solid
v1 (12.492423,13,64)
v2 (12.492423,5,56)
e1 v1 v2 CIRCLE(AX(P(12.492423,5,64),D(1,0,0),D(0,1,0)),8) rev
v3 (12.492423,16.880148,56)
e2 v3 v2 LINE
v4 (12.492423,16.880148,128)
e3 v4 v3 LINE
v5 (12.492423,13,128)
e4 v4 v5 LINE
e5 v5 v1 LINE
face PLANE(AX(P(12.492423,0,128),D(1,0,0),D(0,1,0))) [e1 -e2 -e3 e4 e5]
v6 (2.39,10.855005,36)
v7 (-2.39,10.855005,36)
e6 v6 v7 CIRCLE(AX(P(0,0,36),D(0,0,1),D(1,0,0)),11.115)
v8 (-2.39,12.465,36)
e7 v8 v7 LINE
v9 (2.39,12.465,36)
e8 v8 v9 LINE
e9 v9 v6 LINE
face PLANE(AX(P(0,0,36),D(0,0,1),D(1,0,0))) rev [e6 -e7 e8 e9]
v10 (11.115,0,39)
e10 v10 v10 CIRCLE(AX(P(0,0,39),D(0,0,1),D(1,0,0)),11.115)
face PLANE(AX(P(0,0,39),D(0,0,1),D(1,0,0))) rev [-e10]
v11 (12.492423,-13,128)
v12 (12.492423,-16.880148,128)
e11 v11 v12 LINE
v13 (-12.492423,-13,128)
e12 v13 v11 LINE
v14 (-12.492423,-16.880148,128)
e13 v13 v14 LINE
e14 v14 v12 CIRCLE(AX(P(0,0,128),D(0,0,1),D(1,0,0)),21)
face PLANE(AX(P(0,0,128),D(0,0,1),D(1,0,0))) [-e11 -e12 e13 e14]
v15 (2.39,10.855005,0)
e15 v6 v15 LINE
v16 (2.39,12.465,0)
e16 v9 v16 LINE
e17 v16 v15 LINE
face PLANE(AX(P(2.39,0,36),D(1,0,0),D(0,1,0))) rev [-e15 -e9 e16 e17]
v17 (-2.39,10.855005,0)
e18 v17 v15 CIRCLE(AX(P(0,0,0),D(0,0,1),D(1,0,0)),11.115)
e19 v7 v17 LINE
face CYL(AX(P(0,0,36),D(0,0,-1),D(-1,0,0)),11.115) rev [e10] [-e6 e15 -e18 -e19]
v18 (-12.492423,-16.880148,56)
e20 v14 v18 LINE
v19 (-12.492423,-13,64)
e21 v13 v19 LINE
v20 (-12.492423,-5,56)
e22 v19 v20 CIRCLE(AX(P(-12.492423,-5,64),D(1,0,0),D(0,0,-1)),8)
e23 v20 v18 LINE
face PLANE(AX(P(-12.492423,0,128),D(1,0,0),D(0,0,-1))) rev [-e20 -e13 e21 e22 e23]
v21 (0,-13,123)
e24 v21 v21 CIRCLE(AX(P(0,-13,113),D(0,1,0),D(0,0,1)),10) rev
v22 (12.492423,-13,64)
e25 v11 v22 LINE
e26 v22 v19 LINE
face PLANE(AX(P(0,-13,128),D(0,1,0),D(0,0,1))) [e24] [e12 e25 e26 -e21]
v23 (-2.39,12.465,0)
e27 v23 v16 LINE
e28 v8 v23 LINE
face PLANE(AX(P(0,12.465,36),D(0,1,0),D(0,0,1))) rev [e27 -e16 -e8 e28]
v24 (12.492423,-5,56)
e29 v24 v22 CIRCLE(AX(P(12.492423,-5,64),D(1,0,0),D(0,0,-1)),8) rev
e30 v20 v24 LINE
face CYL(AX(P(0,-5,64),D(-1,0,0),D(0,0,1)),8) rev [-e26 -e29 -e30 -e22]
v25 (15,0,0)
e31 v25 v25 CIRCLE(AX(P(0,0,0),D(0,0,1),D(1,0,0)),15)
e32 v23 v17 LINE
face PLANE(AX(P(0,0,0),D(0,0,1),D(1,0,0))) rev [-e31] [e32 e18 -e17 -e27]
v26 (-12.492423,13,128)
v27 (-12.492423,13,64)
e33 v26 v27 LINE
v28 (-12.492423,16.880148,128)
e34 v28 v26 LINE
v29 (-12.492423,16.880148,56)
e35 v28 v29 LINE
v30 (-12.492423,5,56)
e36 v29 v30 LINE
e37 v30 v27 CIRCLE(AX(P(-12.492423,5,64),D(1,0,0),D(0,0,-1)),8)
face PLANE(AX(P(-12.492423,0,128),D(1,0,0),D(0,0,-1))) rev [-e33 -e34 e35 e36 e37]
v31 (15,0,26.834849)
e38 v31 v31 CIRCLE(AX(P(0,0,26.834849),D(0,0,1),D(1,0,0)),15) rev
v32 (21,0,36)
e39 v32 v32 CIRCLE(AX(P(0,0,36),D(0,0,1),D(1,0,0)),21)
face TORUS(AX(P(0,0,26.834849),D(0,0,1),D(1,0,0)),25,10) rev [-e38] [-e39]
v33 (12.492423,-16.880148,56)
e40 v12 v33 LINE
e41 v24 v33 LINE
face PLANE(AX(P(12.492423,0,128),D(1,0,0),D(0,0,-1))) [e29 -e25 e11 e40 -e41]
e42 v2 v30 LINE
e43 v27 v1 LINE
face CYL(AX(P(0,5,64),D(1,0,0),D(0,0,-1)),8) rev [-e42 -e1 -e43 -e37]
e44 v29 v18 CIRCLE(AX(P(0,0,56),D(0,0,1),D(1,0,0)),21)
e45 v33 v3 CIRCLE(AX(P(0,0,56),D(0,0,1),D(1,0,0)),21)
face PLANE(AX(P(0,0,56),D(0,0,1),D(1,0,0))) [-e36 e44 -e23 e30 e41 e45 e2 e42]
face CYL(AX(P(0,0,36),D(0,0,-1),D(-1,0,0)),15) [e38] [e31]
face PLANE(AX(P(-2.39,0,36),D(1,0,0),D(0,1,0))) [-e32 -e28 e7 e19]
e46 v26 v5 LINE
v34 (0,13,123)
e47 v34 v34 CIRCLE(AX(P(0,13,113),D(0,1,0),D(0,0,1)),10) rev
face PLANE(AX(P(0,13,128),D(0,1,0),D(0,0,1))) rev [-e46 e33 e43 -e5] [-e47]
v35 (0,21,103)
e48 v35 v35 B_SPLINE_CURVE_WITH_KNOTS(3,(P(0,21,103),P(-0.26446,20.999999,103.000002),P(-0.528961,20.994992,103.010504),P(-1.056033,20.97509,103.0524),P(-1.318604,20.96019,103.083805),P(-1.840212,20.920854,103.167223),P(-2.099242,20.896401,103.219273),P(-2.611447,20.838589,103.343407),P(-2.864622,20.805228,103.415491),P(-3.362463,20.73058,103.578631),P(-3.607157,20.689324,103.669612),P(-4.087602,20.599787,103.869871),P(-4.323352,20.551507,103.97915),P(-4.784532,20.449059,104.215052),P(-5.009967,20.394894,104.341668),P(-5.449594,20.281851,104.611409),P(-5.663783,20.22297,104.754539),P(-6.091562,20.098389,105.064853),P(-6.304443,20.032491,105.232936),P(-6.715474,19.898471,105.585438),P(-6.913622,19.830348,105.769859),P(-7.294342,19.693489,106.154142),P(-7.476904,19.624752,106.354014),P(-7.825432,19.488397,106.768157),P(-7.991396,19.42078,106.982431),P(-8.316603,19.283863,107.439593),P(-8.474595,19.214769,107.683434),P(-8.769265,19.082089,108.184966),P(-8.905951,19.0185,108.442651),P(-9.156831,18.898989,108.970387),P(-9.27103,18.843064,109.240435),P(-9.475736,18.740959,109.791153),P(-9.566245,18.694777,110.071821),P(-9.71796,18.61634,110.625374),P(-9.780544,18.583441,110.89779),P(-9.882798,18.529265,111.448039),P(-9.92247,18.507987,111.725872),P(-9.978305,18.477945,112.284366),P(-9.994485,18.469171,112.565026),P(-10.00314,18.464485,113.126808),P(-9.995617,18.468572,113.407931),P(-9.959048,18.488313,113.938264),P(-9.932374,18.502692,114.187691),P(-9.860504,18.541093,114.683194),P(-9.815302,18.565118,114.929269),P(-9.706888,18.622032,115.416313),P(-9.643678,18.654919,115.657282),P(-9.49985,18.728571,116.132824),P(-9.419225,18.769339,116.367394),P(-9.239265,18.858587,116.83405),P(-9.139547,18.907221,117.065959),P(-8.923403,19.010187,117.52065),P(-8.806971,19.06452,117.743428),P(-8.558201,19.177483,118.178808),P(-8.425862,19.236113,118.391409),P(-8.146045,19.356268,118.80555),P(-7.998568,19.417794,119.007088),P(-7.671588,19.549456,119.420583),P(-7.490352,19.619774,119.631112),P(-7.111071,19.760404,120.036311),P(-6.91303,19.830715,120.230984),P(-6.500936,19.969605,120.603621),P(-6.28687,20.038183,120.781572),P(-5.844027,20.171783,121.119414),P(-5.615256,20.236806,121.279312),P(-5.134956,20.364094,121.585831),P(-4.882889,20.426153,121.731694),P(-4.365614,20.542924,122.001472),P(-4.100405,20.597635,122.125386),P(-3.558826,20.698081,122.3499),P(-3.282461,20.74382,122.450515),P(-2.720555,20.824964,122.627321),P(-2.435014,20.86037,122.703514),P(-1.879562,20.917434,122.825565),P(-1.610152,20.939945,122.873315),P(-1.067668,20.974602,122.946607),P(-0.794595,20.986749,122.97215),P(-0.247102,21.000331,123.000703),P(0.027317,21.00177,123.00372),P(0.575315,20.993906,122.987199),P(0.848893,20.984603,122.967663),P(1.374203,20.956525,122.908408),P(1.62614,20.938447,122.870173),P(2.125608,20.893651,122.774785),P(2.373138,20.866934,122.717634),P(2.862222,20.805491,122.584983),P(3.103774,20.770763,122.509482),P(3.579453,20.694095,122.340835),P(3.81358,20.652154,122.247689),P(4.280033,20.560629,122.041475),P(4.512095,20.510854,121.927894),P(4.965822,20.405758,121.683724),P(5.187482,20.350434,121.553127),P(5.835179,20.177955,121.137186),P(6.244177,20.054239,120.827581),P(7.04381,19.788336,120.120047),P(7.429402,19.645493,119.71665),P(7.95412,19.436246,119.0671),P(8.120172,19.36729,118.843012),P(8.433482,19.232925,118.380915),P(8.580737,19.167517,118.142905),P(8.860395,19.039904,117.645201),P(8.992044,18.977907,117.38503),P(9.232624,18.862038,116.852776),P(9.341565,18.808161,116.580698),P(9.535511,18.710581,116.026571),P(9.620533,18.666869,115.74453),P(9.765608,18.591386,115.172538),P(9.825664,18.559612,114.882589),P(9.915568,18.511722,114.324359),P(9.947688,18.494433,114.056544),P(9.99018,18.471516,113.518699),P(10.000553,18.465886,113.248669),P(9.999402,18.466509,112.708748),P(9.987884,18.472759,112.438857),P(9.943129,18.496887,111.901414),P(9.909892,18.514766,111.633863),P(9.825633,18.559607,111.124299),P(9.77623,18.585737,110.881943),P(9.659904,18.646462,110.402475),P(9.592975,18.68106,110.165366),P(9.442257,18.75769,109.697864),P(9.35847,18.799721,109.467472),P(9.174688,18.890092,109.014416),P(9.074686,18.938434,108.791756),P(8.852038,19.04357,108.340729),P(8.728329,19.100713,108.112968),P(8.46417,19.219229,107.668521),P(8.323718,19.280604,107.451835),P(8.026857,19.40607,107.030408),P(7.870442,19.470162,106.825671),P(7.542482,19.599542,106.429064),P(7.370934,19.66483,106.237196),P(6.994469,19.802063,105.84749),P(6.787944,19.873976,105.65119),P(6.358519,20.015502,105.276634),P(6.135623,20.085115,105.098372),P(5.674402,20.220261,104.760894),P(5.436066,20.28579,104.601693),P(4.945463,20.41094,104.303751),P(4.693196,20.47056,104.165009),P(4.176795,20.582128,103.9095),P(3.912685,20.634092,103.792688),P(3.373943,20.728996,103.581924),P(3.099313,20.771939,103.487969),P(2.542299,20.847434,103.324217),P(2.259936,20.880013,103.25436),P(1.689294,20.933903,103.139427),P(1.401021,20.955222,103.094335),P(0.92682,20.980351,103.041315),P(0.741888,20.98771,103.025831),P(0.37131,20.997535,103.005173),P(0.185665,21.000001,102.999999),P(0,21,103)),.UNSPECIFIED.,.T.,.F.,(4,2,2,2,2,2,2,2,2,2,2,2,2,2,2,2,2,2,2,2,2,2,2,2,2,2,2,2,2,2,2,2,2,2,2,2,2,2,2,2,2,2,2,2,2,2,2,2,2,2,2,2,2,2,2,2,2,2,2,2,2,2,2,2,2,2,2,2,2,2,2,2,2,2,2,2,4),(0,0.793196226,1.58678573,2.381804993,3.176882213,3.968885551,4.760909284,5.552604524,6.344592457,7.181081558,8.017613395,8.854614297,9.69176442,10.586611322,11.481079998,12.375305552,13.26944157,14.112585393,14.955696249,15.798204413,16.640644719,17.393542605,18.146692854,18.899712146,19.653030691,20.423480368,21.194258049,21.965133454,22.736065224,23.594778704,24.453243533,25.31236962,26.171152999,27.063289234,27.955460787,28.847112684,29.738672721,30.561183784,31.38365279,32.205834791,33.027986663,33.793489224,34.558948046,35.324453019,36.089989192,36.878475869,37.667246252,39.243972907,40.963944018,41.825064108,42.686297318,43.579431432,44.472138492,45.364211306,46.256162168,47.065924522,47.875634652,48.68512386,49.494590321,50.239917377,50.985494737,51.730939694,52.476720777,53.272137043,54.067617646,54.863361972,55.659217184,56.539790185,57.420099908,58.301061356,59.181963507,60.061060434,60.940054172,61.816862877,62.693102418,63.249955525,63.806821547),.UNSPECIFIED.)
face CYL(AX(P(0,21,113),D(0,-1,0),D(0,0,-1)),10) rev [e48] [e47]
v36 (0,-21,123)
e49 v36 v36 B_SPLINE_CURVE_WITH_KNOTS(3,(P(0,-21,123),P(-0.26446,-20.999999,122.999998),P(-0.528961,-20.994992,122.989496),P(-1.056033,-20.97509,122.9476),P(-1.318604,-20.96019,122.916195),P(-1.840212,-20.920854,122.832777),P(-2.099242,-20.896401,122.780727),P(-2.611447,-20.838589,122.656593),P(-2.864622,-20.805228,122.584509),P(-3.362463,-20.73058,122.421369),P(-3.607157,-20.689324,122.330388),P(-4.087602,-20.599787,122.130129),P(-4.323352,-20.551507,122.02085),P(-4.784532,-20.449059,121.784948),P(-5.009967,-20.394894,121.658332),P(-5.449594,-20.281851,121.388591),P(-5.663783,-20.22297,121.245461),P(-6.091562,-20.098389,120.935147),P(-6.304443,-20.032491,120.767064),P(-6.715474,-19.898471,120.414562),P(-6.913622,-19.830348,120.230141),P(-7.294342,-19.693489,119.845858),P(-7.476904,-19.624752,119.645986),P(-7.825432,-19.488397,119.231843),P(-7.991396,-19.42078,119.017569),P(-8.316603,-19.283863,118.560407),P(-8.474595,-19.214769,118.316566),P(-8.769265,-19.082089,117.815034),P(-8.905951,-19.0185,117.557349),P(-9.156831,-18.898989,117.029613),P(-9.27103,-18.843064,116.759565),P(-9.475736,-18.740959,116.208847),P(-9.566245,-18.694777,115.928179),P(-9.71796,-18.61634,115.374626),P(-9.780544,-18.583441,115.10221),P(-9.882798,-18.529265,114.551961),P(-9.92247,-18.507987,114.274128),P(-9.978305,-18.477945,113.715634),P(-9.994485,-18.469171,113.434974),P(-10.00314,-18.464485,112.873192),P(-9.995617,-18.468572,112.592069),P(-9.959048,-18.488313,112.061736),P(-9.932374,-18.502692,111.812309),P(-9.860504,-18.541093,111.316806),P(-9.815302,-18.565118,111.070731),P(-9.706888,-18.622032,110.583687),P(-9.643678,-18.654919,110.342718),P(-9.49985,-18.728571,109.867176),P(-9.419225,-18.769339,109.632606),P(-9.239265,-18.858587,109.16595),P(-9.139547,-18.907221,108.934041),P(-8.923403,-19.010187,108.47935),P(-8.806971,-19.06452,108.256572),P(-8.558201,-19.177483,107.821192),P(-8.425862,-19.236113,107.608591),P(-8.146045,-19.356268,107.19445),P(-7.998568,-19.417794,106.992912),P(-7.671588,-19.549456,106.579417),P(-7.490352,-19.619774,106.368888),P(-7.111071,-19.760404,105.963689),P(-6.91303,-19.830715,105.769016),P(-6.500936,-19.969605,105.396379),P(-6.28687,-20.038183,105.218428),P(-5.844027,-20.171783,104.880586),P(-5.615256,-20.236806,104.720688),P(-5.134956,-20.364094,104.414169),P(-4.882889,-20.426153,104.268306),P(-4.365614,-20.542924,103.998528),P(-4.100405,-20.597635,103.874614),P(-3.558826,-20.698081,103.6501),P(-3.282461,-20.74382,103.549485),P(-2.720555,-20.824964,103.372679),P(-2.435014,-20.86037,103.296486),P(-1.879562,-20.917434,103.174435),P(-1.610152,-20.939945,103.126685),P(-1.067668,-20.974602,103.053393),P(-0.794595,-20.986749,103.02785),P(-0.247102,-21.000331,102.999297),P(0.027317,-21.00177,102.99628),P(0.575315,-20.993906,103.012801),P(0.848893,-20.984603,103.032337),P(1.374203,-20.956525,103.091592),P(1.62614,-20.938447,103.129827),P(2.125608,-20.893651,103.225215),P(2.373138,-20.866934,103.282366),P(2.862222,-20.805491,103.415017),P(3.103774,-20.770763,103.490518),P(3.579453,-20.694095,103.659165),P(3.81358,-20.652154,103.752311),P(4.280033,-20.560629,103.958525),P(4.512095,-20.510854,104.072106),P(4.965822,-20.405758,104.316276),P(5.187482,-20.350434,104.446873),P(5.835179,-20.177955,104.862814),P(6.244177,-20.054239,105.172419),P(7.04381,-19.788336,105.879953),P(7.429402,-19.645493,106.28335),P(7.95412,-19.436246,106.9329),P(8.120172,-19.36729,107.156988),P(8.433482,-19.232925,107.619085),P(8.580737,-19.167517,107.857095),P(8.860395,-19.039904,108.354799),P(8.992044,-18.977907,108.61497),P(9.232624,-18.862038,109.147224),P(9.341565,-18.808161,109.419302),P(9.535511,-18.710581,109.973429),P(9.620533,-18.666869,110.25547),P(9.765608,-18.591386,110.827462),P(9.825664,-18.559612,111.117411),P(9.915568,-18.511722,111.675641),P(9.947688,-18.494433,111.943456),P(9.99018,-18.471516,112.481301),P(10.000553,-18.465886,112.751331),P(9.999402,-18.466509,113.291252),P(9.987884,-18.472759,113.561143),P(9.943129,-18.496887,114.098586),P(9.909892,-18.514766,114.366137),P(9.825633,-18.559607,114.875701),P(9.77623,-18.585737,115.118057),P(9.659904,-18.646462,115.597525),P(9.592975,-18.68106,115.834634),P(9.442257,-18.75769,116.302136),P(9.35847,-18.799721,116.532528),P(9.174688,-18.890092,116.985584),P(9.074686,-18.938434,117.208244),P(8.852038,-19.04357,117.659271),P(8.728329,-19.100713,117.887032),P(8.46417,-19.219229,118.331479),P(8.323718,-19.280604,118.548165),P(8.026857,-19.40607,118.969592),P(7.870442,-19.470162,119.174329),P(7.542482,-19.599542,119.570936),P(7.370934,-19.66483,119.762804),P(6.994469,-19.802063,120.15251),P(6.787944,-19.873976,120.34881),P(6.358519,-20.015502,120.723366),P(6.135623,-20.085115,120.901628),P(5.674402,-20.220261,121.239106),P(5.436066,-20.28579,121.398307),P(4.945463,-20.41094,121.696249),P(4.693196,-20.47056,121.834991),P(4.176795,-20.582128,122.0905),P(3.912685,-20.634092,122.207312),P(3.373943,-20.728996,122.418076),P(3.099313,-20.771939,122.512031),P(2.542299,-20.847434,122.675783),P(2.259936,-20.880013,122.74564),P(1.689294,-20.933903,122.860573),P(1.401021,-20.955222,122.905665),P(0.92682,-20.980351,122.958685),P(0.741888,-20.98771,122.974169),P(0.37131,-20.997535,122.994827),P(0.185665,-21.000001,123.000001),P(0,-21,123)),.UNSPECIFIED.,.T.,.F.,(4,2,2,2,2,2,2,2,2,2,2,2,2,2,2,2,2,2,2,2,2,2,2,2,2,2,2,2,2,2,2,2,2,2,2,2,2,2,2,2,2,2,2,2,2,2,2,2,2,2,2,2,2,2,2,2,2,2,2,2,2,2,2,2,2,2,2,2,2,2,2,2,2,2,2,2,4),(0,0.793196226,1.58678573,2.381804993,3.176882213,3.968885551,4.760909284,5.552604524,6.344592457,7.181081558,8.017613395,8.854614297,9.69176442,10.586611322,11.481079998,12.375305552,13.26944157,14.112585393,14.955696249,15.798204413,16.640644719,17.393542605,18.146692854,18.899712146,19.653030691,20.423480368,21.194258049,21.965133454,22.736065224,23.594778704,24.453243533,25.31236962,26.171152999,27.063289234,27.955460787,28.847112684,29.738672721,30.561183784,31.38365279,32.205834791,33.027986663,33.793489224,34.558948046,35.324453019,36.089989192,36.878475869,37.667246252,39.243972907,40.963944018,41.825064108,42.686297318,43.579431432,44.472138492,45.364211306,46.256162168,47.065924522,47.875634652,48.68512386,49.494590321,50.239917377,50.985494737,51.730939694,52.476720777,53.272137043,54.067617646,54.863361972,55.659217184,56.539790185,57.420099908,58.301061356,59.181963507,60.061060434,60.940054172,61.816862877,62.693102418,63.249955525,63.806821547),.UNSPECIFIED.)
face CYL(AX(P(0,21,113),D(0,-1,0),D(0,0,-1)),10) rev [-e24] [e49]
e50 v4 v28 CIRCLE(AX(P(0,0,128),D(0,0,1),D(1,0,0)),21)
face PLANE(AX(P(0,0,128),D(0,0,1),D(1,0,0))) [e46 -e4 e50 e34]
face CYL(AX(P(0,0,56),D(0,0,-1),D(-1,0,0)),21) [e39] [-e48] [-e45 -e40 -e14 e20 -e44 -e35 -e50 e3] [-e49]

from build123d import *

# Parameters (mm, degrees)
SZKIC1_R                               = 15
DODANIE_WYCI_GNI_CIE1_DEPTH            = 36
SZKIC3_R                               = 21
SZKIC3_R_2                             = 11.115
DODANIE_WYCI_GNI_CIE2_DEPTH            = 20
DODANIE_WYCI_GNI_CIE4_START            = -17
SZKIC5_R                               = 11.115
DODANIE_WYCI_GNI_CIE4_DEPTH            = 17
ZAOKR_GLENIE1_R                        = 10
DODANIE_WYCI_GNI_CIE3_DEPTH            = 72
ZAOKR_GLENIE2_R                        = 8
WYTNIJ_WYCI_GNI_CIE1_REACH             = 136.093
SZKIC6_R                               = 10
WYTNIJ_WYCI_GNI_CIE1_DIRECTION_2_DEPTH = 135.093251135


with BuildPart() as part:
    # Szkic1 → Dodanie-wyciągnięcie1 (new body)
    with BuildSketch(Plane.XY):
        Circle(SZKIC1_R)
        with BuildLine():
            Line((-2.39, 10.855004606), (-2.39, 12.465))
            Line((-2.39, 12.465), (2.39, 12.465))
            Line((2.39, 12.465), (2.39, 10.855004606))
            ThreePointArc((2.39, 10.855004606), (8.663373333, 6.963417803), (11.115, 0))
            ThreePointArc((11.115, 0), (-6.963417803, -8.663373333), (-2.39, 10.855004606))
        make_face(mode=Mode.SUBTRACT)
    extrude(amount=DODANIE_WYCI_GNI_CIE1_DEPTH)

    # Szkic3 → Dodanie-wyciągnięcie2 (add)
    with BuildSketch(Plane.XY.offset(36)):
        Circle(SZKIC3_R)
        with Locations(Location((0, 0, 0), (0, 0, 102.416978829))):
            Circle(SZKIC3_R_2, mode=Mode.SUBTRACT)
    extrude(amount=DODANIE_WYCI_GNI_CIE2_DEPTH)

    # Szkic5 → Dodanie-wyciągnięcie4 (add)
    with BuildSketch(Plane.XY.offset(56).offset(DODANIE_WYCI_GNI_CIE4_START)):
        with Locations(Location((0, 0, 0), (0, 0, 102.416978829))):
            Circle(SZKIC5_R)
    extrude(amount=DODANIE_WYCI_GNI_CIE4_DEPTH)

    # Zaokrąglenie1
    # the kernel refuses this fillet: 10 mm, written as the material it adds along each edge
    with BuildSketch(Plane(origin=(0, 0, 36), x_dir=(1, 0, 0), z_dir=(0, -1, 0))) as zaokr_glenie1_piece_1:
        with BuildLine():
            CenterArc((25, -9.16515139), ZAOKR_GLENIE1_R, 113.578178478, 66.421821522)
            Line((21, 0), (20.92, 0.183303028))
            ThreePointArc((20.92, 0.183303028), (18, 0.2), (15, 0.2))
            Line((15, 0.2), (14.8, 0))
            Line((14.8, 0), (14.8, -9.16515139))
            Line((14.8, -9.16515139), (15, -9.16515139))
        make_face()
    revolve(axis=Axis((0, 0, 36), (0, 0, 1)))

    # Szkic4 → Dodanie-wyciągnięcie3 (add)
    with BuildSketch(Plane.XY.offset(56)):
        with BuildLine():
            Line((-12.492422502, 16.880147512), (-12.492422502, 13))
            Line((-12.492422502, 13), (12.492422502, 13))
            Line((12.492422502, 13), (12.492422502, 16.880147512))
            ThreePointArc((12.492422502, 16.880147512), (0, 21), (-12.492422502, 16.880147512))
        make_face()
        with BuildLine():
            Line((12.492422502, -13), (-12.492422502, -13))
            Line((-12.492422502, -13), (-12.492422502, -16.880147512))
            ThreePointArc((-12.492422502, -16.880147512), (0, -21), (12.492422502, -16.880147512))
            Line((12.492422502, -16.880147512), (12.492422502, -13))
        make_face()
    extrude(amount=DODANIE_WYCI_GNI_CIE3_DEPTH)

    # Zaokrąglenie2
    zaokr_glenie2_edges = [part.edges().sort_by_distance(p)[0] for p in [
        (0, 13, 56),
        (0, -13, 56),
    ]]
    fillet(zaokr_glenie2_edges, radius=ZAOKR_GLENIE2_R)

    # Szkic6 → Wytnij-wyciągnięcie1 (cut, up to next)
    with BuildSketch(Plane(origin=(0, -13, 0), x_dir=(1, 0, 0), z_dir=(0, 1, 0)), mode=Mode.PRIVATE) as wytnij_wyci_gni_cie1_sk1:
        with Locations(Location((0, -113, 0), (0, 0, 270))):
            Circle(SZKIC6_R)
    wytnij_wyci_gni_cie1_tool1 = extrude(wytnij_wyci_gni_cie1_sk1.sketch, amount=-WYTNIJ_WYCI_GNI_CIE1_REACH, mode=Mode.PRIVATE) & part.part
    add(wytnij_wyci_gni_cie1_tool1.solids().sort_by_distance((0, -13, 113))[0], mode=Mode.SUBTRACT)

    # Szkic6 → Wytnij-wyciągnięcie1 direction 2 (cut)
    with BuildSketch(Plane(origin=(0, -13, 0), x_dir=(1, 0, 0), z_dir=(0, 1, 0))):
        with Locations(Location((0, -113, 0), (0, 0, 270))):
            Circle(SZKIC6_R)
    extrude(amount=WYTNIJ_WYCI_GNI_CIE1_DIRECTION_2_DEPTH, mode=Mode.SUBTRACT)


solid = part.part
